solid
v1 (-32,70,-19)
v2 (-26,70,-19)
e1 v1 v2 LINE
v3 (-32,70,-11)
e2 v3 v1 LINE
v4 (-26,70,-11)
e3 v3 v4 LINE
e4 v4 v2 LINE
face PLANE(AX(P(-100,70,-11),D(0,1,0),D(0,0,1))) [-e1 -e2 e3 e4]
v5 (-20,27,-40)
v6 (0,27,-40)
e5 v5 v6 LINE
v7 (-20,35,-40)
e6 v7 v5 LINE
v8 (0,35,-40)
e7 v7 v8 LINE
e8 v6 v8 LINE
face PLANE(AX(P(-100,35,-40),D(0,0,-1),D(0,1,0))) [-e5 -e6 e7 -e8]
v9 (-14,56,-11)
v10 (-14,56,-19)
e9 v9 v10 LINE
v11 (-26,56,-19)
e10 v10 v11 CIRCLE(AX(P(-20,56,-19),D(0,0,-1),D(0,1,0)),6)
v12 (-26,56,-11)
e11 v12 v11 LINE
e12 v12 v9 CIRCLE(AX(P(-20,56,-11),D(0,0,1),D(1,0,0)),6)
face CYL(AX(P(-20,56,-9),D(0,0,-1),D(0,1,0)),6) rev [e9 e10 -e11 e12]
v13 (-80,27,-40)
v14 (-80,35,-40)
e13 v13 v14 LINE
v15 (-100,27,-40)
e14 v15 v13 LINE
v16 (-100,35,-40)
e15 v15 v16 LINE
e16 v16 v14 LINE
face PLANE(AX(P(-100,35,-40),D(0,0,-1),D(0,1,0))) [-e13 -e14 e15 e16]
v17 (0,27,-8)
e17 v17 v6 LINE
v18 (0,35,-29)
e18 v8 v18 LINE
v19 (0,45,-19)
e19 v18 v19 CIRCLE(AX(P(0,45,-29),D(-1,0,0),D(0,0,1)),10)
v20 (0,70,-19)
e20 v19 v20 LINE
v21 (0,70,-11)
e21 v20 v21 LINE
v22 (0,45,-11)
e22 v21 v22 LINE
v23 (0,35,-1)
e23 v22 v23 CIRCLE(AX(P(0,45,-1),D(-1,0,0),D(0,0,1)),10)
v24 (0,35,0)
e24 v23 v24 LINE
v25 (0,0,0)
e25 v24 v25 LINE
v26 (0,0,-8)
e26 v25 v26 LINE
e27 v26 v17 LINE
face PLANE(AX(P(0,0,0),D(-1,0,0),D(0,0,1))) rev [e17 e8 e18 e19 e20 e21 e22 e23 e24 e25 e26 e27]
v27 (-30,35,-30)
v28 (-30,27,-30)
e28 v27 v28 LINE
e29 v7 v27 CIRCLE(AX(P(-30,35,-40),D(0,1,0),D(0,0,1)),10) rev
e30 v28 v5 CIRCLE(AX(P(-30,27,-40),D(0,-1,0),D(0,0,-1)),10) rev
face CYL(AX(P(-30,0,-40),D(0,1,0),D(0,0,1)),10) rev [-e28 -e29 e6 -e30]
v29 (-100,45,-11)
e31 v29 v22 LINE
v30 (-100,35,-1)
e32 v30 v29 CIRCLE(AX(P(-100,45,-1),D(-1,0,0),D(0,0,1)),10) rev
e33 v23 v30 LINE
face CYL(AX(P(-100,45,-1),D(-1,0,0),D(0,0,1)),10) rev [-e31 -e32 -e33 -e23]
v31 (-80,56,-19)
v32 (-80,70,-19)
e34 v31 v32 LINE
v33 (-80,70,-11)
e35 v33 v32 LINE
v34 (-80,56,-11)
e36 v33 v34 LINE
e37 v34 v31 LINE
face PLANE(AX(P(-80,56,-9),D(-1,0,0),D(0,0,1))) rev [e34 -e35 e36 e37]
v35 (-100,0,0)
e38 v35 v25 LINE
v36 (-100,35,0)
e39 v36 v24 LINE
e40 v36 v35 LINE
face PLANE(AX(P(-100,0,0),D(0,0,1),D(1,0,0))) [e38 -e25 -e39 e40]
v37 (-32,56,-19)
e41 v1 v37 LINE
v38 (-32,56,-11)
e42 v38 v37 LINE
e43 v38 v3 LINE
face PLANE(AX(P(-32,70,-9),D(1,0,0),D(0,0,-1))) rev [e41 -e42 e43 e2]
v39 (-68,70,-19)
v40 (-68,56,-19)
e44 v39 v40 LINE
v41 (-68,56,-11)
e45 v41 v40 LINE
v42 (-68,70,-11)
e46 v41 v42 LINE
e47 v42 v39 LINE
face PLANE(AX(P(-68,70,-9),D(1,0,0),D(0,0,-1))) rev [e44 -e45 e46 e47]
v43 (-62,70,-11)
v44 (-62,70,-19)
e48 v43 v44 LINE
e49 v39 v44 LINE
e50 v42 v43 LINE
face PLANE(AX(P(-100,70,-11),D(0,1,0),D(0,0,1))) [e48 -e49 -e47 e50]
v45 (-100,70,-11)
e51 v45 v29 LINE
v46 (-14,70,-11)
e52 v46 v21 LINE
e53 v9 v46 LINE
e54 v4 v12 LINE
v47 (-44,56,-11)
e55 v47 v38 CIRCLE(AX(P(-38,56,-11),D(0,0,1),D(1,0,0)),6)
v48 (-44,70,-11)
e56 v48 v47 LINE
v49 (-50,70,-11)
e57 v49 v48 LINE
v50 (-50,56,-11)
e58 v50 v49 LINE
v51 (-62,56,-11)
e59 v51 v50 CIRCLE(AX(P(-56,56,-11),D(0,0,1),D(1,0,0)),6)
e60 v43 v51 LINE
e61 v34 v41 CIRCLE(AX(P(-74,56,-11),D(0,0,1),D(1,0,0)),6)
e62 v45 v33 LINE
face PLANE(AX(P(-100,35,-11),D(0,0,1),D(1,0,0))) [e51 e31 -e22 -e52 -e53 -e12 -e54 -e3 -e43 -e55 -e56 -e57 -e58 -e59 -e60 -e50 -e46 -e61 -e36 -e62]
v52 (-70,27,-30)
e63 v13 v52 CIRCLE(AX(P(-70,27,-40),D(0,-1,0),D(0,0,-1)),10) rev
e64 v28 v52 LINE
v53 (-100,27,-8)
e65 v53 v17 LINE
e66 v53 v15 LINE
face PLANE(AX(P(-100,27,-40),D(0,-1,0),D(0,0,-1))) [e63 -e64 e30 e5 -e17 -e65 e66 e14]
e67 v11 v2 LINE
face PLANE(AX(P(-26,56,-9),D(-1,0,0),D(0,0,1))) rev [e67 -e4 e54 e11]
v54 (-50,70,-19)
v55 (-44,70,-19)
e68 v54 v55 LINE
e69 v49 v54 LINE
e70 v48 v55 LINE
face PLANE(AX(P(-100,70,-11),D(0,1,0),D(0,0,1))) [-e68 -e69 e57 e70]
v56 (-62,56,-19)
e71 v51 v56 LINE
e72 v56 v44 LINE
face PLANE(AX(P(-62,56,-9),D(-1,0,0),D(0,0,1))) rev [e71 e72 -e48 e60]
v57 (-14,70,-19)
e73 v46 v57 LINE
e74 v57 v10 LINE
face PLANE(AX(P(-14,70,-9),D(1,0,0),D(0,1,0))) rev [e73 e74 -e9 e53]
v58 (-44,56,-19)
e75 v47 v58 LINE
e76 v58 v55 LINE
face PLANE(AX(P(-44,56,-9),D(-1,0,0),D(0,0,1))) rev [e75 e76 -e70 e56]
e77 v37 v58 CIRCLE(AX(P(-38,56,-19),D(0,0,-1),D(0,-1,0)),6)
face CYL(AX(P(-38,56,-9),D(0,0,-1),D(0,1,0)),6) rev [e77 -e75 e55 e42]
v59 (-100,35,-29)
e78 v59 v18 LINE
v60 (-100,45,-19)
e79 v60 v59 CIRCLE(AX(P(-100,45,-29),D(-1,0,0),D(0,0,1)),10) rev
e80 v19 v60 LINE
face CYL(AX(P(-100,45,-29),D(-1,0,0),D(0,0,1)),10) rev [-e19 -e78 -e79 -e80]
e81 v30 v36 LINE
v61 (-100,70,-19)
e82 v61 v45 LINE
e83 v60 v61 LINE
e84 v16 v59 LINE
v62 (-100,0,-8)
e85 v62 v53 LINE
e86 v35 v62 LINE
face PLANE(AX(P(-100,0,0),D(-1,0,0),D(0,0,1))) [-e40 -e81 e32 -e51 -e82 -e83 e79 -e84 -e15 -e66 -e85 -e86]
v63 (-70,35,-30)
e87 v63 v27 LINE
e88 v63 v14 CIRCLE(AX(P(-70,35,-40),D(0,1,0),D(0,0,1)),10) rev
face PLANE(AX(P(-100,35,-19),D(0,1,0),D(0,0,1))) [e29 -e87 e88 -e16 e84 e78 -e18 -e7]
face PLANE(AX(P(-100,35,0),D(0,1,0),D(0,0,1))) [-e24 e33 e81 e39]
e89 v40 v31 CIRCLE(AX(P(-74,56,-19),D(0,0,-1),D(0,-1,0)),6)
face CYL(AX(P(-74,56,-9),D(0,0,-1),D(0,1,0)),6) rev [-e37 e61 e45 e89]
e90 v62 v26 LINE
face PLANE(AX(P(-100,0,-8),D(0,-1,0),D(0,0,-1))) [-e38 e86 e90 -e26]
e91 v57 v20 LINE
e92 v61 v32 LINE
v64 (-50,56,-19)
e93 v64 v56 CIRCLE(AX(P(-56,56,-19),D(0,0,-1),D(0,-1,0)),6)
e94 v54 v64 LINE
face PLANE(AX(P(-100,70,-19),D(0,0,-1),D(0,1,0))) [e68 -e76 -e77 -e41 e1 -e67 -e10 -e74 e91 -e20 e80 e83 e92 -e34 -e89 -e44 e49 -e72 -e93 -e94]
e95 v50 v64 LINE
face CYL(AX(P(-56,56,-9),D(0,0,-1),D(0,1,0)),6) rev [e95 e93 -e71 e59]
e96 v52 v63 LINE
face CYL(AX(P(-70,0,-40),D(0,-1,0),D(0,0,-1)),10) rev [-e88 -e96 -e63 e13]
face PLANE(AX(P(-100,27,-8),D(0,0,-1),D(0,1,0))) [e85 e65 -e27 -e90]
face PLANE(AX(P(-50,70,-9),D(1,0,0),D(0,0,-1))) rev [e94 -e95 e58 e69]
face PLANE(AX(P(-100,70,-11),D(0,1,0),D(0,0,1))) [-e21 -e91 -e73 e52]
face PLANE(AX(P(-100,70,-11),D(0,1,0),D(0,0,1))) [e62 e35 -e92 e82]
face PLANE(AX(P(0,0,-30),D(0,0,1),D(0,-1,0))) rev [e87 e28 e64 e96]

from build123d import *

# Parameters (mm, degrees)
BOSS_EXTRUDE1_DEPTH = 100
FILLET1_R           = 10
SKETCH4_W           = 60
SKETCH4_H           = 8
CUT_EXTRUDE1_DEPTH  = 10
FILLET2_R           = 10
SKETCH5_W           = 12
SKETCH5_H           = 14
CUT_EXTRUDE2_DEPTH  = 10
CUT_EXTRUDE3_DEPTH  = 10


with BuildPart() as part:
    # Sketch1 → Boss-Extrude1 (new body)
    with BuildSketch(Plane(origin=(0, 0, 0), x_dir=(0, 0, -1), z_dir=(1, 0, 0))):
        Polygon((0, 0), (0, 35), (11, 35), (11, 70), (19, 70), (19, 35), (40, 35), (40, 27), (8, 27), (8, 0), align=None)
    extrude(amount=-BOSS_EXTRUDE1_DEPTH)

    # Fillet1
    fillet1_edges = [part.edges().sort_by_distance(p)[0] for p in [
        (-50, 35, -11),
        (-50, 35, -19),
    ]]
    fillet(fillet1_edges, radius=FILLET1_R)

    # Sketch4 → Cut-Extrude1 (cut)
    with BuildSketch(Plane(origin=(0, 0, -40), x_dir=(-1, 0, 0), z_dir=(0, 0, -1))):
        with Locations((50, 31)):
            Rectangle(SKETCH4_W, SKETCH4_H)
    extrude(amount=-CUT_EXTRUDE1_DEPTH, mode=Mode.SUBTRACT)

    # Fillet2
    fillet2_edges = [part.edges().sort_by_distance(p)[0] for p in [
        (-20, 31, -30),
        (-80, 31, -30),
    ]]
    fillet(fillet2_edges, radius=FILLET2_R - 0.0001)  # a hair under: the kernel refuses the full size

    # Sketch5 → Cut-Extrude2 (cut)
    with BuildSketch(Plane(origin=(0, 0, -19), x_dir=(-1, 0, 0), z_dir=(0, 0, -1))):
        with Locations((20, 63)):
            Rectangle(SKETCH5_W, SKETCH5_H)
        with Locations((38, 63)):
            Rectangle(SKETCH5_W, SKETCH5_H)
        with Locations((74, 63)):
            Rectangle(SKETCH5_W, SKETCH5_H)
        with Locations((56, 63)):
            Rectangle(SKETCH5_W, SKETCH5_H)
    extrude(amount=-CUT_EXTRUDE2_DEPTH, mode=Mode.SUBTRACT)

    # Sketch6 → Cut-Extrude3 (cut)
    with BuildSketch(Plane(origin=(0, 0, -19), x_dir=(-1, 0, 0), z_dir=(0, 0, -1))):
        with BuildLine():
            Line((14, 58.578725951), (14, 56))
            ThreePointArc((14, 56), (20, 50), (26, 56))
            Line((26, 56), (26, 58.578725951))
            Line((26, 58.578725951), (14, 58.578725951))
        make_face()
        with BuildLine():
            Line((32, 56), (32, 58.578725951))
            Line((32, 58.578725951), (44, 58.578725951))
            Line((44, 58.578725951), (44, 56))
            ThreePointArc((44, 56), (38, 50), (32, 56))
        make_face()
        with BuildLine():
            Line((50, 56), (50, 58.578725951))
            Line((50, 58.578725951), (62, 58.578725951))
            Line((62, 58.578725951), (62, 56))
            ThreePointArc((62, 56), (56, 50), (50, 56))
        make_face()
        with BuildLine():
            Line((68, 56), (68, 58.578725951))
            Line((68, 58.578725951), (80, 58.578725951))
            Line((80, 58.578725951), (80, 56))
            ThreePointArc((80, 56), (74, 50), (68, 56))
        make_face()
    extrude(amount=-CUT_EXTRUDE3_DEPTH, mode=Mode.SUBTRACT)


solid = part.part
